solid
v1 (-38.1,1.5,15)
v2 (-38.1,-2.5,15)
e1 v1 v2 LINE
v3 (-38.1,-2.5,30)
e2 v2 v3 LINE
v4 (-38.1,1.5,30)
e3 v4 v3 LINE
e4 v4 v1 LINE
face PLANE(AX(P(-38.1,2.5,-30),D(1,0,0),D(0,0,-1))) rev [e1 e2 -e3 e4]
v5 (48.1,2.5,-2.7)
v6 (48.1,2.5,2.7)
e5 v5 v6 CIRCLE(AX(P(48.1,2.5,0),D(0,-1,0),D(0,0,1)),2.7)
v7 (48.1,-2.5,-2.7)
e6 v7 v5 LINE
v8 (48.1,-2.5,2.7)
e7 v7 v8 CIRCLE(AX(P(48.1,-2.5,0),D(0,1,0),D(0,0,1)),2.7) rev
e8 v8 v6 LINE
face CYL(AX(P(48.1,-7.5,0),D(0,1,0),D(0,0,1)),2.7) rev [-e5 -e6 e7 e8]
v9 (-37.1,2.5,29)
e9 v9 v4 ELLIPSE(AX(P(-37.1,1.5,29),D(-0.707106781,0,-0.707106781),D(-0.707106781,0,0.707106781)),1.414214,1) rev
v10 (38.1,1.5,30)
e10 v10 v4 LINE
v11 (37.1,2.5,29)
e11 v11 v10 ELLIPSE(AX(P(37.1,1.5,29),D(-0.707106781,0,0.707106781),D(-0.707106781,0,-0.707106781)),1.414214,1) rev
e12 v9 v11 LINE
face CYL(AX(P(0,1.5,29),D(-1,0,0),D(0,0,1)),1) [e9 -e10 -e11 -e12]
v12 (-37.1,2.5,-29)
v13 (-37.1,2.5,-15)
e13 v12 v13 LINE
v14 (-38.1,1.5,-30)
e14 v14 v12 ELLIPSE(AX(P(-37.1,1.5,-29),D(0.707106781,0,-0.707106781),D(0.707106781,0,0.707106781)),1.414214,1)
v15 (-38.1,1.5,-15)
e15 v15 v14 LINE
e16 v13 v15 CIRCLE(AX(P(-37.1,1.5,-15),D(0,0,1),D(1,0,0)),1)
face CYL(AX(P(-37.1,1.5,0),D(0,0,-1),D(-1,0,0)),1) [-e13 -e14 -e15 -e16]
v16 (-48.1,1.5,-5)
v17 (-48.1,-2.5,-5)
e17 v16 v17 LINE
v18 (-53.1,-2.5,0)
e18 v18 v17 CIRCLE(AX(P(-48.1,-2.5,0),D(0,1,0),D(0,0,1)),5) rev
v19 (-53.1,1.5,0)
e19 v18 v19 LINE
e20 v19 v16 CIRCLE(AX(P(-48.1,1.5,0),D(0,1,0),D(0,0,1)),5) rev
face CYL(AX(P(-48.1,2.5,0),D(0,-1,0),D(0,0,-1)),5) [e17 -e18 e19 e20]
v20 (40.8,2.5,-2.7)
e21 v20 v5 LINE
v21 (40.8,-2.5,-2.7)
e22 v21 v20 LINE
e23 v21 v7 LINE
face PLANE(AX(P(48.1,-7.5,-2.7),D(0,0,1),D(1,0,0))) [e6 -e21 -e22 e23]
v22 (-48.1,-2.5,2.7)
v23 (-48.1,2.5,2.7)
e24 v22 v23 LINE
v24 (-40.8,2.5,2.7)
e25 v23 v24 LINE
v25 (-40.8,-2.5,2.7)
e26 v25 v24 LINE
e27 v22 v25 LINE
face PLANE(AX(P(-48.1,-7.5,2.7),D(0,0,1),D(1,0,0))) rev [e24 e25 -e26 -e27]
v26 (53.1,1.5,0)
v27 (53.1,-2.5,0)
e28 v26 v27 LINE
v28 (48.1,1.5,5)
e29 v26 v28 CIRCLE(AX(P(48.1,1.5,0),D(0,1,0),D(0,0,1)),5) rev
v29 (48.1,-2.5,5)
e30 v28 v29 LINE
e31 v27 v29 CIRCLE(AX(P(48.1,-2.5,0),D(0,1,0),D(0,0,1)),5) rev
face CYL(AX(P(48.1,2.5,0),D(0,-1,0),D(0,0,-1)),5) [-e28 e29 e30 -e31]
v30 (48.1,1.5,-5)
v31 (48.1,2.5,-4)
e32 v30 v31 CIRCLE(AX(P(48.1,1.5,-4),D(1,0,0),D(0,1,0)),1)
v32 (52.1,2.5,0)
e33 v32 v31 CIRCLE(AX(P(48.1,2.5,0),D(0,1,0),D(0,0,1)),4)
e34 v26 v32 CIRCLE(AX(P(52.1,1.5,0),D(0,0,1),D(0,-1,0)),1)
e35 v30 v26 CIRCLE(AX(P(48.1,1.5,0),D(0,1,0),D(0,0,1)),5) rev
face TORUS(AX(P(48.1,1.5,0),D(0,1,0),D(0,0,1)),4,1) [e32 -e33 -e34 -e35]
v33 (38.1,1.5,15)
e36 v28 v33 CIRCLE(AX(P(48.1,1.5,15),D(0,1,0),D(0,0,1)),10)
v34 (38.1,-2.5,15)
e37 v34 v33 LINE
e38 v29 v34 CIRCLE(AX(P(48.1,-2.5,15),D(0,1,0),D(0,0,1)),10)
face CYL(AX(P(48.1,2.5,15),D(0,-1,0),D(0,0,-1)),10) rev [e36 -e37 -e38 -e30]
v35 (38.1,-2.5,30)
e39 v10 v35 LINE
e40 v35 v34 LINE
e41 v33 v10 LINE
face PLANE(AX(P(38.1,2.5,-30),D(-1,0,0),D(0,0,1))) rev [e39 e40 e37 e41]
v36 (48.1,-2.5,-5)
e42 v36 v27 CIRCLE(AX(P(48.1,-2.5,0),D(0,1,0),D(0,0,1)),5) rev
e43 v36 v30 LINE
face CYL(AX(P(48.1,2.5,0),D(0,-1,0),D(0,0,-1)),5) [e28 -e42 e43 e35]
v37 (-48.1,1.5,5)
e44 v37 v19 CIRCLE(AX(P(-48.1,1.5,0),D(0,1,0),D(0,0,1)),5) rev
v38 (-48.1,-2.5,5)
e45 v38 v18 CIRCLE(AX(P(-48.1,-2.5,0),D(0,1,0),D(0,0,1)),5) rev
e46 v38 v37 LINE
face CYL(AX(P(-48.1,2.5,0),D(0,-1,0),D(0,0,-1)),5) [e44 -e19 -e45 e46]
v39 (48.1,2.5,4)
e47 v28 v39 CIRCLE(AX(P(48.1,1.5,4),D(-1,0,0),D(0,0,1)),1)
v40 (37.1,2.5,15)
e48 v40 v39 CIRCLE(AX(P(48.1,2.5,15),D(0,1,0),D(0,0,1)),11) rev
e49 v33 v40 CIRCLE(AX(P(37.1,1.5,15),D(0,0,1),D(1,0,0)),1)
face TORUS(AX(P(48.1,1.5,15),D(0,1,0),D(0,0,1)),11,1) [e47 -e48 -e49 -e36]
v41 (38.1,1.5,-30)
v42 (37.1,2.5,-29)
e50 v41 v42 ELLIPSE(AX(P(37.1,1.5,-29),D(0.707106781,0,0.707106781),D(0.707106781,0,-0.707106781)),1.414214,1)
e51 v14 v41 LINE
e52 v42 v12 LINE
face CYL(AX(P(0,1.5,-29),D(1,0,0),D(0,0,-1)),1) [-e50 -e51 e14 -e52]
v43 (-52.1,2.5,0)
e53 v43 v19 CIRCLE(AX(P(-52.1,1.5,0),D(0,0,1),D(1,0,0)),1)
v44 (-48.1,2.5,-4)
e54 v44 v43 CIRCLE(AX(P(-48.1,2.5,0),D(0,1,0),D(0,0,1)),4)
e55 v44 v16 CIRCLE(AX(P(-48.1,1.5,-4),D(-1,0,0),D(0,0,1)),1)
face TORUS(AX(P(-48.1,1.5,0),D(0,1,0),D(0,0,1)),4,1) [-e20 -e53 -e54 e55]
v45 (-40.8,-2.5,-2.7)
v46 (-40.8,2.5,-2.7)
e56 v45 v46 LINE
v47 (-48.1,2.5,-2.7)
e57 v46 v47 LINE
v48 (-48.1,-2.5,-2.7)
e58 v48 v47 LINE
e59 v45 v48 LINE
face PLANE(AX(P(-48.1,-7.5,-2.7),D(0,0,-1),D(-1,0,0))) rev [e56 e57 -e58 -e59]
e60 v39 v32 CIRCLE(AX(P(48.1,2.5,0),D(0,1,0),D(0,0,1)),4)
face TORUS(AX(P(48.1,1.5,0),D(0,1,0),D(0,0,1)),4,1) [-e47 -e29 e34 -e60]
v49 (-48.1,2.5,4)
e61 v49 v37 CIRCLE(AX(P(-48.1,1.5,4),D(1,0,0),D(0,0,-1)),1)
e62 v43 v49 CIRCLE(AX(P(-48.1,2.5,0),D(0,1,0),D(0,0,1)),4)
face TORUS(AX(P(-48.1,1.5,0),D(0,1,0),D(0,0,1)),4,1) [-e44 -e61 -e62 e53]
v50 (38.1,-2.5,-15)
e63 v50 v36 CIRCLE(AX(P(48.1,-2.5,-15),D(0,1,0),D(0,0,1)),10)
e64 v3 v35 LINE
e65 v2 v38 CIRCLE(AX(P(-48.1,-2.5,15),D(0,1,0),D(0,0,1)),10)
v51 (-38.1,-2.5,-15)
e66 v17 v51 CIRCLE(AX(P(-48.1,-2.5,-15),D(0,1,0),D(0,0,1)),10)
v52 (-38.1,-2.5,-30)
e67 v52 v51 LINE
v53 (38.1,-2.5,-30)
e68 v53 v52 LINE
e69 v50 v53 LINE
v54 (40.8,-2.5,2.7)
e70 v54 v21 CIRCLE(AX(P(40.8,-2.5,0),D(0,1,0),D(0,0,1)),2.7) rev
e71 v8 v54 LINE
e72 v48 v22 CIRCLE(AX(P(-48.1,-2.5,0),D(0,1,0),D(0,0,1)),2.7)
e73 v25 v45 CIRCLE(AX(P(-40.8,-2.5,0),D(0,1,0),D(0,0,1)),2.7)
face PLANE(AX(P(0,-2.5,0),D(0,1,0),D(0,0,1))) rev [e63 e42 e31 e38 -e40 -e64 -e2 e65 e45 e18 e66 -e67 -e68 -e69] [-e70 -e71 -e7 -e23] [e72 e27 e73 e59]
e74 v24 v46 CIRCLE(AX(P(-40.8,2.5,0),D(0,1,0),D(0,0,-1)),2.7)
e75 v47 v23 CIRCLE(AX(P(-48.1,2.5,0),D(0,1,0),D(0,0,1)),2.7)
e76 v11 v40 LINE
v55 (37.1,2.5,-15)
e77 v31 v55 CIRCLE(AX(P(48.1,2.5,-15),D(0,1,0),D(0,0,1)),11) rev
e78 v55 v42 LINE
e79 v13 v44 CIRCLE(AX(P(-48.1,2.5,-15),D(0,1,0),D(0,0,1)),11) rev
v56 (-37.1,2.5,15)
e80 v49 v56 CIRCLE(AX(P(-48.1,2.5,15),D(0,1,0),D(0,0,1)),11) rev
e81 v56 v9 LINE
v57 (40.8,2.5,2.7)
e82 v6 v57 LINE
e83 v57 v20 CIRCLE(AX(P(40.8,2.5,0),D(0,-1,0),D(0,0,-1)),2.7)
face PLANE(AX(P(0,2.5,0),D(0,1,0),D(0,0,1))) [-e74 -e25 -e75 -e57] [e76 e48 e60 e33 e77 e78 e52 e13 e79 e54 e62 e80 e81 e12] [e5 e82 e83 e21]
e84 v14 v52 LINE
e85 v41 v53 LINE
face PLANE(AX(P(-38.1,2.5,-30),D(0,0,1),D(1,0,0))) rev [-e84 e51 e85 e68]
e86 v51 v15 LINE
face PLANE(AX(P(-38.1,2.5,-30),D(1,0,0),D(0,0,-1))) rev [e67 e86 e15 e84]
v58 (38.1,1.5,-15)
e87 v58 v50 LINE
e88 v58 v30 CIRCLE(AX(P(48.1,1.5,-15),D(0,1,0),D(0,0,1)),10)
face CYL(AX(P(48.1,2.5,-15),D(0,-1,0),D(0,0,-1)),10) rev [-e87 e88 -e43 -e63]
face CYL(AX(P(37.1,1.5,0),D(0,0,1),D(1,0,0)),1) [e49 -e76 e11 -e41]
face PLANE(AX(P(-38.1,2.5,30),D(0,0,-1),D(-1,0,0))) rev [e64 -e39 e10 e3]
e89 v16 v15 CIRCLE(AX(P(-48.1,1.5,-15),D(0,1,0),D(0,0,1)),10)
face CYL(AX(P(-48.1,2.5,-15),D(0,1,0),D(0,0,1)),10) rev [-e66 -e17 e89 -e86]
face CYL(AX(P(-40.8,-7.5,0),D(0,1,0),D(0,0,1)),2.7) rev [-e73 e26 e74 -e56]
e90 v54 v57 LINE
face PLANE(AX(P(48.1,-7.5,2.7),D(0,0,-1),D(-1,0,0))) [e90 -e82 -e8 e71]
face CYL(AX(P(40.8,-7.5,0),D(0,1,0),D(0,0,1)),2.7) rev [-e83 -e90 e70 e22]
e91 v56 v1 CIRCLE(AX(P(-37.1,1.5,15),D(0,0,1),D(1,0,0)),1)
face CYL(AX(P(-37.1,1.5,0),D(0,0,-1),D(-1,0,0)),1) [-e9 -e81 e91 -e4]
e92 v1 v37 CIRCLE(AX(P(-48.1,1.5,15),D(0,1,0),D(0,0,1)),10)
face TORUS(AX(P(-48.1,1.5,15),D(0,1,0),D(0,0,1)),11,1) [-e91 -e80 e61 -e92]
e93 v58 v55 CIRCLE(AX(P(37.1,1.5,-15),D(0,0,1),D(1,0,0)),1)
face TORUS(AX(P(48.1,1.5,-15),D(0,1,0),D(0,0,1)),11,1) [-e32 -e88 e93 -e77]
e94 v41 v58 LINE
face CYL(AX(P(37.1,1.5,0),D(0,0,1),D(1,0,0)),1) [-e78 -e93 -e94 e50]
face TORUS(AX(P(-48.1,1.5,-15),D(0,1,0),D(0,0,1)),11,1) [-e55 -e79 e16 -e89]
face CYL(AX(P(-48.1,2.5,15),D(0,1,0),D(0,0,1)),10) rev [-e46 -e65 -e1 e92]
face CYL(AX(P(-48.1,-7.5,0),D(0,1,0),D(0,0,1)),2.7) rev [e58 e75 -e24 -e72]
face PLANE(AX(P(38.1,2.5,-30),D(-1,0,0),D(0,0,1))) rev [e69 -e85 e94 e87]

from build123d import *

# Parameters (mm, degrees)
SKETCH1_W           = 76.2
SKETCH1_H           = 60
BOSS_EXTRUDE1_DEPTH = 2.5
SKETCH2_W           = 15
SKETCH2_H           = 10
BOSS_EXTRUDE2_DEPTH = 2.5
CUT_EXTRUDE1_DEPTH  = 10
FILLET1_R           = 10
FILLET2_R           = 5
FILLET3_R           = 1


with BuildPart() as part:
    # Sketch1 → Boss-Extrude1 (new, symmetric)
    with BuildSketch(Plane(origin=(0, 0, 0), x_dir=(1, 0, 0), z_dir=(0, 1, 0))):
        Rectangle(SKETCH1_W, SKETCH1_H)
    extrude(amount=BOSS_EXTRUDE1_DEPTH, both=True)

    # Sketch2 → Boss-Extrude2 (add, symmetric)
    with BuildSketch(Plane(origin=(0, 0, 0), x_dir=(1, 0, 0), z_dir=(0, 1, 0))):
        with Locations((-45.6, 0)):
            Rectangle(SKETCH2_W, SKETCH2_H)
    boss_extrude2 = extrude(amount=BOSS_EXTRUDE2_DEPTH, both=True)

    # Sketch3 → Cut-Extrude1 (cut)
    with BuildSketch(Plane(origin=(0, 2.5, 0), x_dir=(1, 0, 0), z_dir=(0, 1, 0))):
        with BuildLine():
            Line((-48.1, 2.7), (-40.8, 2.7))
            ThreePointArc((-40.8, 2.7), (-38.1, 0), (-40.8, -2.7))
            Line((-40.8, -2.7), (-48.1, -2.7))
            ThreePointArc((-48.1, -2.7), (-50.8, 0), (-48.1, 2.7))
        make_face()
    cut_extrude1 = extrude(amount=-CUT_EXTRUDE1_DEPTH, mode=Mode.SUBTRACT)

    # Mirror4: Boss-Extrude2, Cut-Extrude1 across plane
    add(boss_extrude2.mirror(Plane(origin=(0, 0, 0), x_dir=(0, 0, 1), z_dir=(1, 0, 0))))
    add(cut_extrude1.mirror(Plane(origin=(0, 0, 0), x_dir=(0, 0, 1), z_dir=(1, 0, 0))), mode=Mode.SUBTRACT)

    # Fillet1
    fillet1_edges = [part.edges().sort_by_distance(p)[0] for p in [
        (-38.1, 0, 5),
        (-38.1, 0, -5),
        (38.1, 0, -5),
        (38.1, 0, 5),
    ]]
    fillet(fillet1_edges, radius=FILLET1_R)

    # Fillet2
    fillet2_edges = [part.edges().sort_by_distance(p)[0] for p in [
        (-53.1, 0, -5),
        (-53.1, 0, 5),
        (53.1, 0, -5),
        (53.1, 0, 5),
    ]]
    fillet(fillet2_edges, radius=FILLET2_R - 0.0001)  # a hair under: the kernel refuses the full size

    # Fillet3
    fillet3_edges = [part.edges().sort_by_distance(p)[0] for p in [
        (38.1, 2.5, 22.5),
        (-51.635563195, 2.5, 3.535563195),
        (-51.635563195, 2.5, -3.535563195),
        (51.635563195, 2.5, 3.535563195),
        (51.635563195, 2.5, -3.535563195),
        (0, 2.5, -30),
        (-38.1, 2.5, -22.5),
        (0, 2.5, 30),
        (38.1, 2.5, -22.5),
        (-38.1, 2.5, 22.5),
        (41.028932188, 2.5, -7.928932188),
        (41.028932188, 2.5, 7.928932188),
        (-41.028932188, 2.5, -7.928932188),
        (-41.028932188, 2.5, 7.928932188),
    ]]
    fillet(fillet3_edges, radius=FILLET3_R)


solid = part.part
